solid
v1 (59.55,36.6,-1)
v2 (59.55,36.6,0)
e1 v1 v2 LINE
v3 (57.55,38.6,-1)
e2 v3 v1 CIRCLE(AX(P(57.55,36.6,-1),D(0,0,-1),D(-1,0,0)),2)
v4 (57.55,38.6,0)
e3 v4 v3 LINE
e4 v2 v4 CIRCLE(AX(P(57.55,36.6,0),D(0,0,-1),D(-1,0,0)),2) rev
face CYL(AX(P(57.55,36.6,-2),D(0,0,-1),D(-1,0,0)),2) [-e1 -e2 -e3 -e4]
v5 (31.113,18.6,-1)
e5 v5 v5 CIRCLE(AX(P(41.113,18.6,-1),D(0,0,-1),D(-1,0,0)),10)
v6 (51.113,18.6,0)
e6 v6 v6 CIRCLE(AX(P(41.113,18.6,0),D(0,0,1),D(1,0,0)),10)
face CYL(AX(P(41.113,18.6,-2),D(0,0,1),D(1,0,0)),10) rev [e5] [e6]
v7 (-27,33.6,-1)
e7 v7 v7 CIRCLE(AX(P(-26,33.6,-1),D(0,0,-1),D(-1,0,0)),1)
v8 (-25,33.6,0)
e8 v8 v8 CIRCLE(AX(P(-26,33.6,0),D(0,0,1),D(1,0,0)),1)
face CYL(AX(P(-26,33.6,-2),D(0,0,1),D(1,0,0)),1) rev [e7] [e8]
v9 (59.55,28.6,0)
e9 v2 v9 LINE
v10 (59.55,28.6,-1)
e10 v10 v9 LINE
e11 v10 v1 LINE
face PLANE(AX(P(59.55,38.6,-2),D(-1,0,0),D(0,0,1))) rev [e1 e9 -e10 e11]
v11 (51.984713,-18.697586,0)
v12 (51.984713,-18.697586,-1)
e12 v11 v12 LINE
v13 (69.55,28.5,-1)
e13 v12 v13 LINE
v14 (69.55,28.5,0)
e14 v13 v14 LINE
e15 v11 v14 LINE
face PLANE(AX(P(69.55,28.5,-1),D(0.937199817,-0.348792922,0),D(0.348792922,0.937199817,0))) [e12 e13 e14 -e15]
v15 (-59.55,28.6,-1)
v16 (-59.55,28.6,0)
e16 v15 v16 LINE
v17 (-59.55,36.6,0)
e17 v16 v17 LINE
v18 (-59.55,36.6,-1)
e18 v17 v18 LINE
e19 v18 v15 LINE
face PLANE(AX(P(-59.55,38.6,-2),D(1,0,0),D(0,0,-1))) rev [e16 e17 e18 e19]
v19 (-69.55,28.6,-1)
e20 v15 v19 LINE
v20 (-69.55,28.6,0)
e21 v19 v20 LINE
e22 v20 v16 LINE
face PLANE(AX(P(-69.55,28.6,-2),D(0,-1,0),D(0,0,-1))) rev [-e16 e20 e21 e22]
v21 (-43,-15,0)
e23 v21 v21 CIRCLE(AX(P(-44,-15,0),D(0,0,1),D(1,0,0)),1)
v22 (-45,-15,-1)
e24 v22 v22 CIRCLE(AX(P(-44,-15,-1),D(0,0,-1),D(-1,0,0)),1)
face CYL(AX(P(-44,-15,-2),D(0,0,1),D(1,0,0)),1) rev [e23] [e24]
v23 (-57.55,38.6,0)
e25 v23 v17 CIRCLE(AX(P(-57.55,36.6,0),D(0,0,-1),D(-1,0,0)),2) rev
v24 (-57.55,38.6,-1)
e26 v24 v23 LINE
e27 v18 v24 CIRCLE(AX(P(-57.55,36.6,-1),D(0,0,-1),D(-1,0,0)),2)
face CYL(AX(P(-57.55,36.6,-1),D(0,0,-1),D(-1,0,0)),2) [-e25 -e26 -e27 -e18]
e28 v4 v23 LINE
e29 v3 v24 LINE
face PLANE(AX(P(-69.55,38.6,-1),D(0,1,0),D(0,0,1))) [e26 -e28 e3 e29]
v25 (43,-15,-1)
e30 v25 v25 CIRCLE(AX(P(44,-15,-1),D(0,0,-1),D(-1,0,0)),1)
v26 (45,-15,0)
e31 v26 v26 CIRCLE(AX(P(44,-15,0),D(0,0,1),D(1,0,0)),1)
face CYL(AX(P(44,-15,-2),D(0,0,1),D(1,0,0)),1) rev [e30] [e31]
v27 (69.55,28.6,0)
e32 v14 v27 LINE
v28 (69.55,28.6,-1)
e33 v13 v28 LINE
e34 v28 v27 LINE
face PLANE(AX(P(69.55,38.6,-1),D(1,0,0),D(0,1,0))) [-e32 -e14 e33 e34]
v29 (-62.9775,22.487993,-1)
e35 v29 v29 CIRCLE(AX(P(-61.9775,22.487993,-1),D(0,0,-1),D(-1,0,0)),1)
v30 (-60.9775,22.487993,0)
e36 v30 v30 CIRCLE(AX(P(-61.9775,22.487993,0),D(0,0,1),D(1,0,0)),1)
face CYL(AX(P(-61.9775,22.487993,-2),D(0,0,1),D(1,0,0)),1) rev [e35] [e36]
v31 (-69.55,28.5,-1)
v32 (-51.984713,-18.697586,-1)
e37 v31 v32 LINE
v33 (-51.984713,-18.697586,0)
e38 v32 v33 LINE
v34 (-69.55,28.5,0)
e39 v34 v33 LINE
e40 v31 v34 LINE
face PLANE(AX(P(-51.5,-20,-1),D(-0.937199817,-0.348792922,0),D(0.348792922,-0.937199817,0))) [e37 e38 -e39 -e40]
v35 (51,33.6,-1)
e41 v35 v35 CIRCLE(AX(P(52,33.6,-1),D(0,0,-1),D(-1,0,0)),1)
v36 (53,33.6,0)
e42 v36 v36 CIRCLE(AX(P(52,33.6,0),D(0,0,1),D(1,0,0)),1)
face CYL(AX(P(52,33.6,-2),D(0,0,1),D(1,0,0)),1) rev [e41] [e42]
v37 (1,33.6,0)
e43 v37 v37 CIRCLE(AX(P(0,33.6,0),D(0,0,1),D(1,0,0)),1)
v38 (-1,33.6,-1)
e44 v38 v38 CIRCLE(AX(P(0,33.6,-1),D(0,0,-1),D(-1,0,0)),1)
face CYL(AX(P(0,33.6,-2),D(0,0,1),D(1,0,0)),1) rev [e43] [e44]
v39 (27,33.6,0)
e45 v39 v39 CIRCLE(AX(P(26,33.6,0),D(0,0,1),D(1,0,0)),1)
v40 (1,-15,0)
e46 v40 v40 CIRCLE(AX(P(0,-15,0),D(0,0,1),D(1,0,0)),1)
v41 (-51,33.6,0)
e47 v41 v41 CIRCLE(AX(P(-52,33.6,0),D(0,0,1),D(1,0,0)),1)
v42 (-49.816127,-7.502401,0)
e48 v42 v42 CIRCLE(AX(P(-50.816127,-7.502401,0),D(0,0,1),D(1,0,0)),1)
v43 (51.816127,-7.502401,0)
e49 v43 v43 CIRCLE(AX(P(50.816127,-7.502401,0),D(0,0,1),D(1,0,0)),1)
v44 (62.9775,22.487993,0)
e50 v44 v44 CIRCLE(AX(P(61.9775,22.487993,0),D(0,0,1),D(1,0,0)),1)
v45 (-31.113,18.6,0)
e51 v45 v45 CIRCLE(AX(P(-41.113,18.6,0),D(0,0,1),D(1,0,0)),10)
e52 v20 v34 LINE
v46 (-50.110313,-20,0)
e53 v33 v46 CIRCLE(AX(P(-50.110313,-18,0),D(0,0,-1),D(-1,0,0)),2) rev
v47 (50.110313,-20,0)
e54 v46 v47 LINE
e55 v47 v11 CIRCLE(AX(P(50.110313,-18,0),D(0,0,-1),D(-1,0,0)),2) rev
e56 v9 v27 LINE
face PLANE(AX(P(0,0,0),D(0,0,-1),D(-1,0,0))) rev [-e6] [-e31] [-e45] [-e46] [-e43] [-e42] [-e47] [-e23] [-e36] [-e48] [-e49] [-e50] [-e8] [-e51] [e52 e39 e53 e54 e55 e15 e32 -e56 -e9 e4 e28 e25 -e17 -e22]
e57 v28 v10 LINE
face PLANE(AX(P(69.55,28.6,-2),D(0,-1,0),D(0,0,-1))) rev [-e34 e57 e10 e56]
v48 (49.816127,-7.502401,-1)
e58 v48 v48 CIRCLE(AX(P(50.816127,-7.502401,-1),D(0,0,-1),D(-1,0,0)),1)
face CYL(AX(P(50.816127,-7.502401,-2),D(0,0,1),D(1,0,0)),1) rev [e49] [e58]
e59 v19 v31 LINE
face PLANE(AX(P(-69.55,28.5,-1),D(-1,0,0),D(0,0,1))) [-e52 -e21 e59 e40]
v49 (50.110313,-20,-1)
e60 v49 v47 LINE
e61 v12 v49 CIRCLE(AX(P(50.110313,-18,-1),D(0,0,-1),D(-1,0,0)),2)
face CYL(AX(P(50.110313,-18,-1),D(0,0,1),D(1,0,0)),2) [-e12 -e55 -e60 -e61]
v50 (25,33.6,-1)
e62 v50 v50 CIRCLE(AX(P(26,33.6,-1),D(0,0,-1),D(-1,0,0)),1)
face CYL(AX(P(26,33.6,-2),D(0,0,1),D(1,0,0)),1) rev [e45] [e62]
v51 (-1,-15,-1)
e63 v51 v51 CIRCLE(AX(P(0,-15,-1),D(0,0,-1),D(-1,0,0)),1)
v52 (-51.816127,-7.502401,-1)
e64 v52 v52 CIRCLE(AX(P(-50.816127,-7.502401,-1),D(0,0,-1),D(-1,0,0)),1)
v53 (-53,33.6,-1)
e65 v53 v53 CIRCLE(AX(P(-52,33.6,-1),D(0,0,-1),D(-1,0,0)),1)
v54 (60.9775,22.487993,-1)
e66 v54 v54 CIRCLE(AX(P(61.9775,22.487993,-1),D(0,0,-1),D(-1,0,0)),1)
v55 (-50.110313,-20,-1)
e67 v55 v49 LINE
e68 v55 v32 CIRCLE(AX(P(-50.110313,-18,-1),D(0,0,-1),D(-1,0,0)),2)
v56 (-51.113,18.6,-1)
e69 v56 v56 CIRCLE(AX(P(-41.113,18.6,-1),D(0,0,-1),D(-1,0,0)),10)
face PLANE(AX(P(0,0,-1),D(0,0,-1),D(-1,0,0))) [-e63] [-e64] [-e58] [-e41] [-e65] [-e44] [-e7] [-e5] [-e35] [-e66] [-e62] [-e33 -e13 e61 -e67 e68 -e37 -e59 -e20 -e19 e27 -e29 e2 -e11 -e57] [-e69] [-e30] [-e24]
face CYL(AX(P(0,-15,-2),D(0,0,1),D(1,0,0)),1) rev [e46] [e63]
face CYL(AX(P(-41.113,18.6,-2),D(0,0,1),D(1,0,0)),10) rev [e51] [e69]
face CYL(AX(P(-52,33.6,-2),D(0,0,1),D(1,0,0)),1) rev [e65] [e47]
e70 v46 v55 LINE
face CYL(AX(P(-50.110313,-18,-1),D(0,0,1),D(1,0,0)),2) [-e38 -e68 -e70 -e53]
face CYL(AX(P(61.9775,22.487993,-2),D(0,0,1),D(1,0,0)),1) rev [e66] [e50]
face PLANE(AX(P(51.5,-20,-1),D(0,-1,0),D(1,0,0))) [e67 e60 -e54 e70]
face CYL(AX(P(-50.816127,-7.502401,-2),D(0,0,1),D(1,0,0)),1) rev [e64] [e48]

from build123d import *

# Parameters (mm, degrees)
SM_BASE_FLANGE_1_DEPTH = 1
SKETCH_3_R             = 1
SKETCH_3_R_2           = 10
SKETCH_3_W             = 10
SKETCH_3_H             = 10
CUT_EXTRUDE_1_DEPTH    = 2
FILLET_1_R             = 2


# Sheet-metal steps are written as plain solids
with BuildPart() as part:
    # Sketch 1 → 基材-凸緣1 (new body)
    with BuildSketch(Plane.XY):
        Polygon((-69.55, 38.6), (69.55, 38.6), (69.55, 28.5), (51.5, -20), (-51.5, -20), (-69.55, 28.5), align=None)
    extrude(amount=-SM_BASE_FLANGE_1_DEPTH)

    # 草圖3 → 除料-伸長1 (cut)
    with BuildSketch(Plane.XY):
        with Locations((0, -15)):
            Circle(SKETCH_3_R)
        with Locations((44, -15)):
            Circle(SKETCH_3_R)
        with Locations((-44, -15)):
            Circle(SKETCH_3_R)
        with Locations((-50.81612653, -7.502401461)):
            Circle(SKETCH_3_R)
        with Locations((-61.977500026, 22.487992696)):
            Circle(SKETCH_3_R)
        with Locations((0, 33.6)):
            Circle(SKETCH_3_R)
        with Locations((-26, 33.6)):
            Circle(SKETCH_3_R)
        with Locations((-52, 33.6)):
            Circle(SKETCH_3_R)
        with Locations((26, 33.6)):
            Circle(SKETCH_3_R)
        with Locations((52, 33.6)):
            Circle(SKETCH_3_R)
        with Locations((61.977500026, 22.487992696)):
            Circle(SKETCH_3_R)
        with Locations((50.81612653, -7.502401461)):
            Circle(SKETCH_3_R)
        with Locations((-41.112999651, 18.6)):
            Circle(SKETCH_3_R_2)
        with Locations((41.112999651, 18.6)):
            Circle(SKETCH_3_R_2)
        with Locations((-64.55, 33.6)):
            Rectangle(SKETCH_3_W, SKETCH_3_H)
        with Locations((64.55, 33.6)):
            Rectangle(SKETCH_3_W, SKETCH_3_H)
    extrude(amount=-CUT_EXTRUDE_1_DEPTH, mode=Mode.SUBTRACT)

    # 圓角1
    fillet_1_edges = [part.edges().sort_by_distance(p)[0] for p in [
        (51.5, -20, -0.5),
        (-51.5, -20, -0.5),
        (59.55, 38.6, -0.5),
        (-59.55, 38.6, -0.5),
    ]]
    fillet(fillet_1_edges, radius=FILLET_1_R)


solid = part.part
